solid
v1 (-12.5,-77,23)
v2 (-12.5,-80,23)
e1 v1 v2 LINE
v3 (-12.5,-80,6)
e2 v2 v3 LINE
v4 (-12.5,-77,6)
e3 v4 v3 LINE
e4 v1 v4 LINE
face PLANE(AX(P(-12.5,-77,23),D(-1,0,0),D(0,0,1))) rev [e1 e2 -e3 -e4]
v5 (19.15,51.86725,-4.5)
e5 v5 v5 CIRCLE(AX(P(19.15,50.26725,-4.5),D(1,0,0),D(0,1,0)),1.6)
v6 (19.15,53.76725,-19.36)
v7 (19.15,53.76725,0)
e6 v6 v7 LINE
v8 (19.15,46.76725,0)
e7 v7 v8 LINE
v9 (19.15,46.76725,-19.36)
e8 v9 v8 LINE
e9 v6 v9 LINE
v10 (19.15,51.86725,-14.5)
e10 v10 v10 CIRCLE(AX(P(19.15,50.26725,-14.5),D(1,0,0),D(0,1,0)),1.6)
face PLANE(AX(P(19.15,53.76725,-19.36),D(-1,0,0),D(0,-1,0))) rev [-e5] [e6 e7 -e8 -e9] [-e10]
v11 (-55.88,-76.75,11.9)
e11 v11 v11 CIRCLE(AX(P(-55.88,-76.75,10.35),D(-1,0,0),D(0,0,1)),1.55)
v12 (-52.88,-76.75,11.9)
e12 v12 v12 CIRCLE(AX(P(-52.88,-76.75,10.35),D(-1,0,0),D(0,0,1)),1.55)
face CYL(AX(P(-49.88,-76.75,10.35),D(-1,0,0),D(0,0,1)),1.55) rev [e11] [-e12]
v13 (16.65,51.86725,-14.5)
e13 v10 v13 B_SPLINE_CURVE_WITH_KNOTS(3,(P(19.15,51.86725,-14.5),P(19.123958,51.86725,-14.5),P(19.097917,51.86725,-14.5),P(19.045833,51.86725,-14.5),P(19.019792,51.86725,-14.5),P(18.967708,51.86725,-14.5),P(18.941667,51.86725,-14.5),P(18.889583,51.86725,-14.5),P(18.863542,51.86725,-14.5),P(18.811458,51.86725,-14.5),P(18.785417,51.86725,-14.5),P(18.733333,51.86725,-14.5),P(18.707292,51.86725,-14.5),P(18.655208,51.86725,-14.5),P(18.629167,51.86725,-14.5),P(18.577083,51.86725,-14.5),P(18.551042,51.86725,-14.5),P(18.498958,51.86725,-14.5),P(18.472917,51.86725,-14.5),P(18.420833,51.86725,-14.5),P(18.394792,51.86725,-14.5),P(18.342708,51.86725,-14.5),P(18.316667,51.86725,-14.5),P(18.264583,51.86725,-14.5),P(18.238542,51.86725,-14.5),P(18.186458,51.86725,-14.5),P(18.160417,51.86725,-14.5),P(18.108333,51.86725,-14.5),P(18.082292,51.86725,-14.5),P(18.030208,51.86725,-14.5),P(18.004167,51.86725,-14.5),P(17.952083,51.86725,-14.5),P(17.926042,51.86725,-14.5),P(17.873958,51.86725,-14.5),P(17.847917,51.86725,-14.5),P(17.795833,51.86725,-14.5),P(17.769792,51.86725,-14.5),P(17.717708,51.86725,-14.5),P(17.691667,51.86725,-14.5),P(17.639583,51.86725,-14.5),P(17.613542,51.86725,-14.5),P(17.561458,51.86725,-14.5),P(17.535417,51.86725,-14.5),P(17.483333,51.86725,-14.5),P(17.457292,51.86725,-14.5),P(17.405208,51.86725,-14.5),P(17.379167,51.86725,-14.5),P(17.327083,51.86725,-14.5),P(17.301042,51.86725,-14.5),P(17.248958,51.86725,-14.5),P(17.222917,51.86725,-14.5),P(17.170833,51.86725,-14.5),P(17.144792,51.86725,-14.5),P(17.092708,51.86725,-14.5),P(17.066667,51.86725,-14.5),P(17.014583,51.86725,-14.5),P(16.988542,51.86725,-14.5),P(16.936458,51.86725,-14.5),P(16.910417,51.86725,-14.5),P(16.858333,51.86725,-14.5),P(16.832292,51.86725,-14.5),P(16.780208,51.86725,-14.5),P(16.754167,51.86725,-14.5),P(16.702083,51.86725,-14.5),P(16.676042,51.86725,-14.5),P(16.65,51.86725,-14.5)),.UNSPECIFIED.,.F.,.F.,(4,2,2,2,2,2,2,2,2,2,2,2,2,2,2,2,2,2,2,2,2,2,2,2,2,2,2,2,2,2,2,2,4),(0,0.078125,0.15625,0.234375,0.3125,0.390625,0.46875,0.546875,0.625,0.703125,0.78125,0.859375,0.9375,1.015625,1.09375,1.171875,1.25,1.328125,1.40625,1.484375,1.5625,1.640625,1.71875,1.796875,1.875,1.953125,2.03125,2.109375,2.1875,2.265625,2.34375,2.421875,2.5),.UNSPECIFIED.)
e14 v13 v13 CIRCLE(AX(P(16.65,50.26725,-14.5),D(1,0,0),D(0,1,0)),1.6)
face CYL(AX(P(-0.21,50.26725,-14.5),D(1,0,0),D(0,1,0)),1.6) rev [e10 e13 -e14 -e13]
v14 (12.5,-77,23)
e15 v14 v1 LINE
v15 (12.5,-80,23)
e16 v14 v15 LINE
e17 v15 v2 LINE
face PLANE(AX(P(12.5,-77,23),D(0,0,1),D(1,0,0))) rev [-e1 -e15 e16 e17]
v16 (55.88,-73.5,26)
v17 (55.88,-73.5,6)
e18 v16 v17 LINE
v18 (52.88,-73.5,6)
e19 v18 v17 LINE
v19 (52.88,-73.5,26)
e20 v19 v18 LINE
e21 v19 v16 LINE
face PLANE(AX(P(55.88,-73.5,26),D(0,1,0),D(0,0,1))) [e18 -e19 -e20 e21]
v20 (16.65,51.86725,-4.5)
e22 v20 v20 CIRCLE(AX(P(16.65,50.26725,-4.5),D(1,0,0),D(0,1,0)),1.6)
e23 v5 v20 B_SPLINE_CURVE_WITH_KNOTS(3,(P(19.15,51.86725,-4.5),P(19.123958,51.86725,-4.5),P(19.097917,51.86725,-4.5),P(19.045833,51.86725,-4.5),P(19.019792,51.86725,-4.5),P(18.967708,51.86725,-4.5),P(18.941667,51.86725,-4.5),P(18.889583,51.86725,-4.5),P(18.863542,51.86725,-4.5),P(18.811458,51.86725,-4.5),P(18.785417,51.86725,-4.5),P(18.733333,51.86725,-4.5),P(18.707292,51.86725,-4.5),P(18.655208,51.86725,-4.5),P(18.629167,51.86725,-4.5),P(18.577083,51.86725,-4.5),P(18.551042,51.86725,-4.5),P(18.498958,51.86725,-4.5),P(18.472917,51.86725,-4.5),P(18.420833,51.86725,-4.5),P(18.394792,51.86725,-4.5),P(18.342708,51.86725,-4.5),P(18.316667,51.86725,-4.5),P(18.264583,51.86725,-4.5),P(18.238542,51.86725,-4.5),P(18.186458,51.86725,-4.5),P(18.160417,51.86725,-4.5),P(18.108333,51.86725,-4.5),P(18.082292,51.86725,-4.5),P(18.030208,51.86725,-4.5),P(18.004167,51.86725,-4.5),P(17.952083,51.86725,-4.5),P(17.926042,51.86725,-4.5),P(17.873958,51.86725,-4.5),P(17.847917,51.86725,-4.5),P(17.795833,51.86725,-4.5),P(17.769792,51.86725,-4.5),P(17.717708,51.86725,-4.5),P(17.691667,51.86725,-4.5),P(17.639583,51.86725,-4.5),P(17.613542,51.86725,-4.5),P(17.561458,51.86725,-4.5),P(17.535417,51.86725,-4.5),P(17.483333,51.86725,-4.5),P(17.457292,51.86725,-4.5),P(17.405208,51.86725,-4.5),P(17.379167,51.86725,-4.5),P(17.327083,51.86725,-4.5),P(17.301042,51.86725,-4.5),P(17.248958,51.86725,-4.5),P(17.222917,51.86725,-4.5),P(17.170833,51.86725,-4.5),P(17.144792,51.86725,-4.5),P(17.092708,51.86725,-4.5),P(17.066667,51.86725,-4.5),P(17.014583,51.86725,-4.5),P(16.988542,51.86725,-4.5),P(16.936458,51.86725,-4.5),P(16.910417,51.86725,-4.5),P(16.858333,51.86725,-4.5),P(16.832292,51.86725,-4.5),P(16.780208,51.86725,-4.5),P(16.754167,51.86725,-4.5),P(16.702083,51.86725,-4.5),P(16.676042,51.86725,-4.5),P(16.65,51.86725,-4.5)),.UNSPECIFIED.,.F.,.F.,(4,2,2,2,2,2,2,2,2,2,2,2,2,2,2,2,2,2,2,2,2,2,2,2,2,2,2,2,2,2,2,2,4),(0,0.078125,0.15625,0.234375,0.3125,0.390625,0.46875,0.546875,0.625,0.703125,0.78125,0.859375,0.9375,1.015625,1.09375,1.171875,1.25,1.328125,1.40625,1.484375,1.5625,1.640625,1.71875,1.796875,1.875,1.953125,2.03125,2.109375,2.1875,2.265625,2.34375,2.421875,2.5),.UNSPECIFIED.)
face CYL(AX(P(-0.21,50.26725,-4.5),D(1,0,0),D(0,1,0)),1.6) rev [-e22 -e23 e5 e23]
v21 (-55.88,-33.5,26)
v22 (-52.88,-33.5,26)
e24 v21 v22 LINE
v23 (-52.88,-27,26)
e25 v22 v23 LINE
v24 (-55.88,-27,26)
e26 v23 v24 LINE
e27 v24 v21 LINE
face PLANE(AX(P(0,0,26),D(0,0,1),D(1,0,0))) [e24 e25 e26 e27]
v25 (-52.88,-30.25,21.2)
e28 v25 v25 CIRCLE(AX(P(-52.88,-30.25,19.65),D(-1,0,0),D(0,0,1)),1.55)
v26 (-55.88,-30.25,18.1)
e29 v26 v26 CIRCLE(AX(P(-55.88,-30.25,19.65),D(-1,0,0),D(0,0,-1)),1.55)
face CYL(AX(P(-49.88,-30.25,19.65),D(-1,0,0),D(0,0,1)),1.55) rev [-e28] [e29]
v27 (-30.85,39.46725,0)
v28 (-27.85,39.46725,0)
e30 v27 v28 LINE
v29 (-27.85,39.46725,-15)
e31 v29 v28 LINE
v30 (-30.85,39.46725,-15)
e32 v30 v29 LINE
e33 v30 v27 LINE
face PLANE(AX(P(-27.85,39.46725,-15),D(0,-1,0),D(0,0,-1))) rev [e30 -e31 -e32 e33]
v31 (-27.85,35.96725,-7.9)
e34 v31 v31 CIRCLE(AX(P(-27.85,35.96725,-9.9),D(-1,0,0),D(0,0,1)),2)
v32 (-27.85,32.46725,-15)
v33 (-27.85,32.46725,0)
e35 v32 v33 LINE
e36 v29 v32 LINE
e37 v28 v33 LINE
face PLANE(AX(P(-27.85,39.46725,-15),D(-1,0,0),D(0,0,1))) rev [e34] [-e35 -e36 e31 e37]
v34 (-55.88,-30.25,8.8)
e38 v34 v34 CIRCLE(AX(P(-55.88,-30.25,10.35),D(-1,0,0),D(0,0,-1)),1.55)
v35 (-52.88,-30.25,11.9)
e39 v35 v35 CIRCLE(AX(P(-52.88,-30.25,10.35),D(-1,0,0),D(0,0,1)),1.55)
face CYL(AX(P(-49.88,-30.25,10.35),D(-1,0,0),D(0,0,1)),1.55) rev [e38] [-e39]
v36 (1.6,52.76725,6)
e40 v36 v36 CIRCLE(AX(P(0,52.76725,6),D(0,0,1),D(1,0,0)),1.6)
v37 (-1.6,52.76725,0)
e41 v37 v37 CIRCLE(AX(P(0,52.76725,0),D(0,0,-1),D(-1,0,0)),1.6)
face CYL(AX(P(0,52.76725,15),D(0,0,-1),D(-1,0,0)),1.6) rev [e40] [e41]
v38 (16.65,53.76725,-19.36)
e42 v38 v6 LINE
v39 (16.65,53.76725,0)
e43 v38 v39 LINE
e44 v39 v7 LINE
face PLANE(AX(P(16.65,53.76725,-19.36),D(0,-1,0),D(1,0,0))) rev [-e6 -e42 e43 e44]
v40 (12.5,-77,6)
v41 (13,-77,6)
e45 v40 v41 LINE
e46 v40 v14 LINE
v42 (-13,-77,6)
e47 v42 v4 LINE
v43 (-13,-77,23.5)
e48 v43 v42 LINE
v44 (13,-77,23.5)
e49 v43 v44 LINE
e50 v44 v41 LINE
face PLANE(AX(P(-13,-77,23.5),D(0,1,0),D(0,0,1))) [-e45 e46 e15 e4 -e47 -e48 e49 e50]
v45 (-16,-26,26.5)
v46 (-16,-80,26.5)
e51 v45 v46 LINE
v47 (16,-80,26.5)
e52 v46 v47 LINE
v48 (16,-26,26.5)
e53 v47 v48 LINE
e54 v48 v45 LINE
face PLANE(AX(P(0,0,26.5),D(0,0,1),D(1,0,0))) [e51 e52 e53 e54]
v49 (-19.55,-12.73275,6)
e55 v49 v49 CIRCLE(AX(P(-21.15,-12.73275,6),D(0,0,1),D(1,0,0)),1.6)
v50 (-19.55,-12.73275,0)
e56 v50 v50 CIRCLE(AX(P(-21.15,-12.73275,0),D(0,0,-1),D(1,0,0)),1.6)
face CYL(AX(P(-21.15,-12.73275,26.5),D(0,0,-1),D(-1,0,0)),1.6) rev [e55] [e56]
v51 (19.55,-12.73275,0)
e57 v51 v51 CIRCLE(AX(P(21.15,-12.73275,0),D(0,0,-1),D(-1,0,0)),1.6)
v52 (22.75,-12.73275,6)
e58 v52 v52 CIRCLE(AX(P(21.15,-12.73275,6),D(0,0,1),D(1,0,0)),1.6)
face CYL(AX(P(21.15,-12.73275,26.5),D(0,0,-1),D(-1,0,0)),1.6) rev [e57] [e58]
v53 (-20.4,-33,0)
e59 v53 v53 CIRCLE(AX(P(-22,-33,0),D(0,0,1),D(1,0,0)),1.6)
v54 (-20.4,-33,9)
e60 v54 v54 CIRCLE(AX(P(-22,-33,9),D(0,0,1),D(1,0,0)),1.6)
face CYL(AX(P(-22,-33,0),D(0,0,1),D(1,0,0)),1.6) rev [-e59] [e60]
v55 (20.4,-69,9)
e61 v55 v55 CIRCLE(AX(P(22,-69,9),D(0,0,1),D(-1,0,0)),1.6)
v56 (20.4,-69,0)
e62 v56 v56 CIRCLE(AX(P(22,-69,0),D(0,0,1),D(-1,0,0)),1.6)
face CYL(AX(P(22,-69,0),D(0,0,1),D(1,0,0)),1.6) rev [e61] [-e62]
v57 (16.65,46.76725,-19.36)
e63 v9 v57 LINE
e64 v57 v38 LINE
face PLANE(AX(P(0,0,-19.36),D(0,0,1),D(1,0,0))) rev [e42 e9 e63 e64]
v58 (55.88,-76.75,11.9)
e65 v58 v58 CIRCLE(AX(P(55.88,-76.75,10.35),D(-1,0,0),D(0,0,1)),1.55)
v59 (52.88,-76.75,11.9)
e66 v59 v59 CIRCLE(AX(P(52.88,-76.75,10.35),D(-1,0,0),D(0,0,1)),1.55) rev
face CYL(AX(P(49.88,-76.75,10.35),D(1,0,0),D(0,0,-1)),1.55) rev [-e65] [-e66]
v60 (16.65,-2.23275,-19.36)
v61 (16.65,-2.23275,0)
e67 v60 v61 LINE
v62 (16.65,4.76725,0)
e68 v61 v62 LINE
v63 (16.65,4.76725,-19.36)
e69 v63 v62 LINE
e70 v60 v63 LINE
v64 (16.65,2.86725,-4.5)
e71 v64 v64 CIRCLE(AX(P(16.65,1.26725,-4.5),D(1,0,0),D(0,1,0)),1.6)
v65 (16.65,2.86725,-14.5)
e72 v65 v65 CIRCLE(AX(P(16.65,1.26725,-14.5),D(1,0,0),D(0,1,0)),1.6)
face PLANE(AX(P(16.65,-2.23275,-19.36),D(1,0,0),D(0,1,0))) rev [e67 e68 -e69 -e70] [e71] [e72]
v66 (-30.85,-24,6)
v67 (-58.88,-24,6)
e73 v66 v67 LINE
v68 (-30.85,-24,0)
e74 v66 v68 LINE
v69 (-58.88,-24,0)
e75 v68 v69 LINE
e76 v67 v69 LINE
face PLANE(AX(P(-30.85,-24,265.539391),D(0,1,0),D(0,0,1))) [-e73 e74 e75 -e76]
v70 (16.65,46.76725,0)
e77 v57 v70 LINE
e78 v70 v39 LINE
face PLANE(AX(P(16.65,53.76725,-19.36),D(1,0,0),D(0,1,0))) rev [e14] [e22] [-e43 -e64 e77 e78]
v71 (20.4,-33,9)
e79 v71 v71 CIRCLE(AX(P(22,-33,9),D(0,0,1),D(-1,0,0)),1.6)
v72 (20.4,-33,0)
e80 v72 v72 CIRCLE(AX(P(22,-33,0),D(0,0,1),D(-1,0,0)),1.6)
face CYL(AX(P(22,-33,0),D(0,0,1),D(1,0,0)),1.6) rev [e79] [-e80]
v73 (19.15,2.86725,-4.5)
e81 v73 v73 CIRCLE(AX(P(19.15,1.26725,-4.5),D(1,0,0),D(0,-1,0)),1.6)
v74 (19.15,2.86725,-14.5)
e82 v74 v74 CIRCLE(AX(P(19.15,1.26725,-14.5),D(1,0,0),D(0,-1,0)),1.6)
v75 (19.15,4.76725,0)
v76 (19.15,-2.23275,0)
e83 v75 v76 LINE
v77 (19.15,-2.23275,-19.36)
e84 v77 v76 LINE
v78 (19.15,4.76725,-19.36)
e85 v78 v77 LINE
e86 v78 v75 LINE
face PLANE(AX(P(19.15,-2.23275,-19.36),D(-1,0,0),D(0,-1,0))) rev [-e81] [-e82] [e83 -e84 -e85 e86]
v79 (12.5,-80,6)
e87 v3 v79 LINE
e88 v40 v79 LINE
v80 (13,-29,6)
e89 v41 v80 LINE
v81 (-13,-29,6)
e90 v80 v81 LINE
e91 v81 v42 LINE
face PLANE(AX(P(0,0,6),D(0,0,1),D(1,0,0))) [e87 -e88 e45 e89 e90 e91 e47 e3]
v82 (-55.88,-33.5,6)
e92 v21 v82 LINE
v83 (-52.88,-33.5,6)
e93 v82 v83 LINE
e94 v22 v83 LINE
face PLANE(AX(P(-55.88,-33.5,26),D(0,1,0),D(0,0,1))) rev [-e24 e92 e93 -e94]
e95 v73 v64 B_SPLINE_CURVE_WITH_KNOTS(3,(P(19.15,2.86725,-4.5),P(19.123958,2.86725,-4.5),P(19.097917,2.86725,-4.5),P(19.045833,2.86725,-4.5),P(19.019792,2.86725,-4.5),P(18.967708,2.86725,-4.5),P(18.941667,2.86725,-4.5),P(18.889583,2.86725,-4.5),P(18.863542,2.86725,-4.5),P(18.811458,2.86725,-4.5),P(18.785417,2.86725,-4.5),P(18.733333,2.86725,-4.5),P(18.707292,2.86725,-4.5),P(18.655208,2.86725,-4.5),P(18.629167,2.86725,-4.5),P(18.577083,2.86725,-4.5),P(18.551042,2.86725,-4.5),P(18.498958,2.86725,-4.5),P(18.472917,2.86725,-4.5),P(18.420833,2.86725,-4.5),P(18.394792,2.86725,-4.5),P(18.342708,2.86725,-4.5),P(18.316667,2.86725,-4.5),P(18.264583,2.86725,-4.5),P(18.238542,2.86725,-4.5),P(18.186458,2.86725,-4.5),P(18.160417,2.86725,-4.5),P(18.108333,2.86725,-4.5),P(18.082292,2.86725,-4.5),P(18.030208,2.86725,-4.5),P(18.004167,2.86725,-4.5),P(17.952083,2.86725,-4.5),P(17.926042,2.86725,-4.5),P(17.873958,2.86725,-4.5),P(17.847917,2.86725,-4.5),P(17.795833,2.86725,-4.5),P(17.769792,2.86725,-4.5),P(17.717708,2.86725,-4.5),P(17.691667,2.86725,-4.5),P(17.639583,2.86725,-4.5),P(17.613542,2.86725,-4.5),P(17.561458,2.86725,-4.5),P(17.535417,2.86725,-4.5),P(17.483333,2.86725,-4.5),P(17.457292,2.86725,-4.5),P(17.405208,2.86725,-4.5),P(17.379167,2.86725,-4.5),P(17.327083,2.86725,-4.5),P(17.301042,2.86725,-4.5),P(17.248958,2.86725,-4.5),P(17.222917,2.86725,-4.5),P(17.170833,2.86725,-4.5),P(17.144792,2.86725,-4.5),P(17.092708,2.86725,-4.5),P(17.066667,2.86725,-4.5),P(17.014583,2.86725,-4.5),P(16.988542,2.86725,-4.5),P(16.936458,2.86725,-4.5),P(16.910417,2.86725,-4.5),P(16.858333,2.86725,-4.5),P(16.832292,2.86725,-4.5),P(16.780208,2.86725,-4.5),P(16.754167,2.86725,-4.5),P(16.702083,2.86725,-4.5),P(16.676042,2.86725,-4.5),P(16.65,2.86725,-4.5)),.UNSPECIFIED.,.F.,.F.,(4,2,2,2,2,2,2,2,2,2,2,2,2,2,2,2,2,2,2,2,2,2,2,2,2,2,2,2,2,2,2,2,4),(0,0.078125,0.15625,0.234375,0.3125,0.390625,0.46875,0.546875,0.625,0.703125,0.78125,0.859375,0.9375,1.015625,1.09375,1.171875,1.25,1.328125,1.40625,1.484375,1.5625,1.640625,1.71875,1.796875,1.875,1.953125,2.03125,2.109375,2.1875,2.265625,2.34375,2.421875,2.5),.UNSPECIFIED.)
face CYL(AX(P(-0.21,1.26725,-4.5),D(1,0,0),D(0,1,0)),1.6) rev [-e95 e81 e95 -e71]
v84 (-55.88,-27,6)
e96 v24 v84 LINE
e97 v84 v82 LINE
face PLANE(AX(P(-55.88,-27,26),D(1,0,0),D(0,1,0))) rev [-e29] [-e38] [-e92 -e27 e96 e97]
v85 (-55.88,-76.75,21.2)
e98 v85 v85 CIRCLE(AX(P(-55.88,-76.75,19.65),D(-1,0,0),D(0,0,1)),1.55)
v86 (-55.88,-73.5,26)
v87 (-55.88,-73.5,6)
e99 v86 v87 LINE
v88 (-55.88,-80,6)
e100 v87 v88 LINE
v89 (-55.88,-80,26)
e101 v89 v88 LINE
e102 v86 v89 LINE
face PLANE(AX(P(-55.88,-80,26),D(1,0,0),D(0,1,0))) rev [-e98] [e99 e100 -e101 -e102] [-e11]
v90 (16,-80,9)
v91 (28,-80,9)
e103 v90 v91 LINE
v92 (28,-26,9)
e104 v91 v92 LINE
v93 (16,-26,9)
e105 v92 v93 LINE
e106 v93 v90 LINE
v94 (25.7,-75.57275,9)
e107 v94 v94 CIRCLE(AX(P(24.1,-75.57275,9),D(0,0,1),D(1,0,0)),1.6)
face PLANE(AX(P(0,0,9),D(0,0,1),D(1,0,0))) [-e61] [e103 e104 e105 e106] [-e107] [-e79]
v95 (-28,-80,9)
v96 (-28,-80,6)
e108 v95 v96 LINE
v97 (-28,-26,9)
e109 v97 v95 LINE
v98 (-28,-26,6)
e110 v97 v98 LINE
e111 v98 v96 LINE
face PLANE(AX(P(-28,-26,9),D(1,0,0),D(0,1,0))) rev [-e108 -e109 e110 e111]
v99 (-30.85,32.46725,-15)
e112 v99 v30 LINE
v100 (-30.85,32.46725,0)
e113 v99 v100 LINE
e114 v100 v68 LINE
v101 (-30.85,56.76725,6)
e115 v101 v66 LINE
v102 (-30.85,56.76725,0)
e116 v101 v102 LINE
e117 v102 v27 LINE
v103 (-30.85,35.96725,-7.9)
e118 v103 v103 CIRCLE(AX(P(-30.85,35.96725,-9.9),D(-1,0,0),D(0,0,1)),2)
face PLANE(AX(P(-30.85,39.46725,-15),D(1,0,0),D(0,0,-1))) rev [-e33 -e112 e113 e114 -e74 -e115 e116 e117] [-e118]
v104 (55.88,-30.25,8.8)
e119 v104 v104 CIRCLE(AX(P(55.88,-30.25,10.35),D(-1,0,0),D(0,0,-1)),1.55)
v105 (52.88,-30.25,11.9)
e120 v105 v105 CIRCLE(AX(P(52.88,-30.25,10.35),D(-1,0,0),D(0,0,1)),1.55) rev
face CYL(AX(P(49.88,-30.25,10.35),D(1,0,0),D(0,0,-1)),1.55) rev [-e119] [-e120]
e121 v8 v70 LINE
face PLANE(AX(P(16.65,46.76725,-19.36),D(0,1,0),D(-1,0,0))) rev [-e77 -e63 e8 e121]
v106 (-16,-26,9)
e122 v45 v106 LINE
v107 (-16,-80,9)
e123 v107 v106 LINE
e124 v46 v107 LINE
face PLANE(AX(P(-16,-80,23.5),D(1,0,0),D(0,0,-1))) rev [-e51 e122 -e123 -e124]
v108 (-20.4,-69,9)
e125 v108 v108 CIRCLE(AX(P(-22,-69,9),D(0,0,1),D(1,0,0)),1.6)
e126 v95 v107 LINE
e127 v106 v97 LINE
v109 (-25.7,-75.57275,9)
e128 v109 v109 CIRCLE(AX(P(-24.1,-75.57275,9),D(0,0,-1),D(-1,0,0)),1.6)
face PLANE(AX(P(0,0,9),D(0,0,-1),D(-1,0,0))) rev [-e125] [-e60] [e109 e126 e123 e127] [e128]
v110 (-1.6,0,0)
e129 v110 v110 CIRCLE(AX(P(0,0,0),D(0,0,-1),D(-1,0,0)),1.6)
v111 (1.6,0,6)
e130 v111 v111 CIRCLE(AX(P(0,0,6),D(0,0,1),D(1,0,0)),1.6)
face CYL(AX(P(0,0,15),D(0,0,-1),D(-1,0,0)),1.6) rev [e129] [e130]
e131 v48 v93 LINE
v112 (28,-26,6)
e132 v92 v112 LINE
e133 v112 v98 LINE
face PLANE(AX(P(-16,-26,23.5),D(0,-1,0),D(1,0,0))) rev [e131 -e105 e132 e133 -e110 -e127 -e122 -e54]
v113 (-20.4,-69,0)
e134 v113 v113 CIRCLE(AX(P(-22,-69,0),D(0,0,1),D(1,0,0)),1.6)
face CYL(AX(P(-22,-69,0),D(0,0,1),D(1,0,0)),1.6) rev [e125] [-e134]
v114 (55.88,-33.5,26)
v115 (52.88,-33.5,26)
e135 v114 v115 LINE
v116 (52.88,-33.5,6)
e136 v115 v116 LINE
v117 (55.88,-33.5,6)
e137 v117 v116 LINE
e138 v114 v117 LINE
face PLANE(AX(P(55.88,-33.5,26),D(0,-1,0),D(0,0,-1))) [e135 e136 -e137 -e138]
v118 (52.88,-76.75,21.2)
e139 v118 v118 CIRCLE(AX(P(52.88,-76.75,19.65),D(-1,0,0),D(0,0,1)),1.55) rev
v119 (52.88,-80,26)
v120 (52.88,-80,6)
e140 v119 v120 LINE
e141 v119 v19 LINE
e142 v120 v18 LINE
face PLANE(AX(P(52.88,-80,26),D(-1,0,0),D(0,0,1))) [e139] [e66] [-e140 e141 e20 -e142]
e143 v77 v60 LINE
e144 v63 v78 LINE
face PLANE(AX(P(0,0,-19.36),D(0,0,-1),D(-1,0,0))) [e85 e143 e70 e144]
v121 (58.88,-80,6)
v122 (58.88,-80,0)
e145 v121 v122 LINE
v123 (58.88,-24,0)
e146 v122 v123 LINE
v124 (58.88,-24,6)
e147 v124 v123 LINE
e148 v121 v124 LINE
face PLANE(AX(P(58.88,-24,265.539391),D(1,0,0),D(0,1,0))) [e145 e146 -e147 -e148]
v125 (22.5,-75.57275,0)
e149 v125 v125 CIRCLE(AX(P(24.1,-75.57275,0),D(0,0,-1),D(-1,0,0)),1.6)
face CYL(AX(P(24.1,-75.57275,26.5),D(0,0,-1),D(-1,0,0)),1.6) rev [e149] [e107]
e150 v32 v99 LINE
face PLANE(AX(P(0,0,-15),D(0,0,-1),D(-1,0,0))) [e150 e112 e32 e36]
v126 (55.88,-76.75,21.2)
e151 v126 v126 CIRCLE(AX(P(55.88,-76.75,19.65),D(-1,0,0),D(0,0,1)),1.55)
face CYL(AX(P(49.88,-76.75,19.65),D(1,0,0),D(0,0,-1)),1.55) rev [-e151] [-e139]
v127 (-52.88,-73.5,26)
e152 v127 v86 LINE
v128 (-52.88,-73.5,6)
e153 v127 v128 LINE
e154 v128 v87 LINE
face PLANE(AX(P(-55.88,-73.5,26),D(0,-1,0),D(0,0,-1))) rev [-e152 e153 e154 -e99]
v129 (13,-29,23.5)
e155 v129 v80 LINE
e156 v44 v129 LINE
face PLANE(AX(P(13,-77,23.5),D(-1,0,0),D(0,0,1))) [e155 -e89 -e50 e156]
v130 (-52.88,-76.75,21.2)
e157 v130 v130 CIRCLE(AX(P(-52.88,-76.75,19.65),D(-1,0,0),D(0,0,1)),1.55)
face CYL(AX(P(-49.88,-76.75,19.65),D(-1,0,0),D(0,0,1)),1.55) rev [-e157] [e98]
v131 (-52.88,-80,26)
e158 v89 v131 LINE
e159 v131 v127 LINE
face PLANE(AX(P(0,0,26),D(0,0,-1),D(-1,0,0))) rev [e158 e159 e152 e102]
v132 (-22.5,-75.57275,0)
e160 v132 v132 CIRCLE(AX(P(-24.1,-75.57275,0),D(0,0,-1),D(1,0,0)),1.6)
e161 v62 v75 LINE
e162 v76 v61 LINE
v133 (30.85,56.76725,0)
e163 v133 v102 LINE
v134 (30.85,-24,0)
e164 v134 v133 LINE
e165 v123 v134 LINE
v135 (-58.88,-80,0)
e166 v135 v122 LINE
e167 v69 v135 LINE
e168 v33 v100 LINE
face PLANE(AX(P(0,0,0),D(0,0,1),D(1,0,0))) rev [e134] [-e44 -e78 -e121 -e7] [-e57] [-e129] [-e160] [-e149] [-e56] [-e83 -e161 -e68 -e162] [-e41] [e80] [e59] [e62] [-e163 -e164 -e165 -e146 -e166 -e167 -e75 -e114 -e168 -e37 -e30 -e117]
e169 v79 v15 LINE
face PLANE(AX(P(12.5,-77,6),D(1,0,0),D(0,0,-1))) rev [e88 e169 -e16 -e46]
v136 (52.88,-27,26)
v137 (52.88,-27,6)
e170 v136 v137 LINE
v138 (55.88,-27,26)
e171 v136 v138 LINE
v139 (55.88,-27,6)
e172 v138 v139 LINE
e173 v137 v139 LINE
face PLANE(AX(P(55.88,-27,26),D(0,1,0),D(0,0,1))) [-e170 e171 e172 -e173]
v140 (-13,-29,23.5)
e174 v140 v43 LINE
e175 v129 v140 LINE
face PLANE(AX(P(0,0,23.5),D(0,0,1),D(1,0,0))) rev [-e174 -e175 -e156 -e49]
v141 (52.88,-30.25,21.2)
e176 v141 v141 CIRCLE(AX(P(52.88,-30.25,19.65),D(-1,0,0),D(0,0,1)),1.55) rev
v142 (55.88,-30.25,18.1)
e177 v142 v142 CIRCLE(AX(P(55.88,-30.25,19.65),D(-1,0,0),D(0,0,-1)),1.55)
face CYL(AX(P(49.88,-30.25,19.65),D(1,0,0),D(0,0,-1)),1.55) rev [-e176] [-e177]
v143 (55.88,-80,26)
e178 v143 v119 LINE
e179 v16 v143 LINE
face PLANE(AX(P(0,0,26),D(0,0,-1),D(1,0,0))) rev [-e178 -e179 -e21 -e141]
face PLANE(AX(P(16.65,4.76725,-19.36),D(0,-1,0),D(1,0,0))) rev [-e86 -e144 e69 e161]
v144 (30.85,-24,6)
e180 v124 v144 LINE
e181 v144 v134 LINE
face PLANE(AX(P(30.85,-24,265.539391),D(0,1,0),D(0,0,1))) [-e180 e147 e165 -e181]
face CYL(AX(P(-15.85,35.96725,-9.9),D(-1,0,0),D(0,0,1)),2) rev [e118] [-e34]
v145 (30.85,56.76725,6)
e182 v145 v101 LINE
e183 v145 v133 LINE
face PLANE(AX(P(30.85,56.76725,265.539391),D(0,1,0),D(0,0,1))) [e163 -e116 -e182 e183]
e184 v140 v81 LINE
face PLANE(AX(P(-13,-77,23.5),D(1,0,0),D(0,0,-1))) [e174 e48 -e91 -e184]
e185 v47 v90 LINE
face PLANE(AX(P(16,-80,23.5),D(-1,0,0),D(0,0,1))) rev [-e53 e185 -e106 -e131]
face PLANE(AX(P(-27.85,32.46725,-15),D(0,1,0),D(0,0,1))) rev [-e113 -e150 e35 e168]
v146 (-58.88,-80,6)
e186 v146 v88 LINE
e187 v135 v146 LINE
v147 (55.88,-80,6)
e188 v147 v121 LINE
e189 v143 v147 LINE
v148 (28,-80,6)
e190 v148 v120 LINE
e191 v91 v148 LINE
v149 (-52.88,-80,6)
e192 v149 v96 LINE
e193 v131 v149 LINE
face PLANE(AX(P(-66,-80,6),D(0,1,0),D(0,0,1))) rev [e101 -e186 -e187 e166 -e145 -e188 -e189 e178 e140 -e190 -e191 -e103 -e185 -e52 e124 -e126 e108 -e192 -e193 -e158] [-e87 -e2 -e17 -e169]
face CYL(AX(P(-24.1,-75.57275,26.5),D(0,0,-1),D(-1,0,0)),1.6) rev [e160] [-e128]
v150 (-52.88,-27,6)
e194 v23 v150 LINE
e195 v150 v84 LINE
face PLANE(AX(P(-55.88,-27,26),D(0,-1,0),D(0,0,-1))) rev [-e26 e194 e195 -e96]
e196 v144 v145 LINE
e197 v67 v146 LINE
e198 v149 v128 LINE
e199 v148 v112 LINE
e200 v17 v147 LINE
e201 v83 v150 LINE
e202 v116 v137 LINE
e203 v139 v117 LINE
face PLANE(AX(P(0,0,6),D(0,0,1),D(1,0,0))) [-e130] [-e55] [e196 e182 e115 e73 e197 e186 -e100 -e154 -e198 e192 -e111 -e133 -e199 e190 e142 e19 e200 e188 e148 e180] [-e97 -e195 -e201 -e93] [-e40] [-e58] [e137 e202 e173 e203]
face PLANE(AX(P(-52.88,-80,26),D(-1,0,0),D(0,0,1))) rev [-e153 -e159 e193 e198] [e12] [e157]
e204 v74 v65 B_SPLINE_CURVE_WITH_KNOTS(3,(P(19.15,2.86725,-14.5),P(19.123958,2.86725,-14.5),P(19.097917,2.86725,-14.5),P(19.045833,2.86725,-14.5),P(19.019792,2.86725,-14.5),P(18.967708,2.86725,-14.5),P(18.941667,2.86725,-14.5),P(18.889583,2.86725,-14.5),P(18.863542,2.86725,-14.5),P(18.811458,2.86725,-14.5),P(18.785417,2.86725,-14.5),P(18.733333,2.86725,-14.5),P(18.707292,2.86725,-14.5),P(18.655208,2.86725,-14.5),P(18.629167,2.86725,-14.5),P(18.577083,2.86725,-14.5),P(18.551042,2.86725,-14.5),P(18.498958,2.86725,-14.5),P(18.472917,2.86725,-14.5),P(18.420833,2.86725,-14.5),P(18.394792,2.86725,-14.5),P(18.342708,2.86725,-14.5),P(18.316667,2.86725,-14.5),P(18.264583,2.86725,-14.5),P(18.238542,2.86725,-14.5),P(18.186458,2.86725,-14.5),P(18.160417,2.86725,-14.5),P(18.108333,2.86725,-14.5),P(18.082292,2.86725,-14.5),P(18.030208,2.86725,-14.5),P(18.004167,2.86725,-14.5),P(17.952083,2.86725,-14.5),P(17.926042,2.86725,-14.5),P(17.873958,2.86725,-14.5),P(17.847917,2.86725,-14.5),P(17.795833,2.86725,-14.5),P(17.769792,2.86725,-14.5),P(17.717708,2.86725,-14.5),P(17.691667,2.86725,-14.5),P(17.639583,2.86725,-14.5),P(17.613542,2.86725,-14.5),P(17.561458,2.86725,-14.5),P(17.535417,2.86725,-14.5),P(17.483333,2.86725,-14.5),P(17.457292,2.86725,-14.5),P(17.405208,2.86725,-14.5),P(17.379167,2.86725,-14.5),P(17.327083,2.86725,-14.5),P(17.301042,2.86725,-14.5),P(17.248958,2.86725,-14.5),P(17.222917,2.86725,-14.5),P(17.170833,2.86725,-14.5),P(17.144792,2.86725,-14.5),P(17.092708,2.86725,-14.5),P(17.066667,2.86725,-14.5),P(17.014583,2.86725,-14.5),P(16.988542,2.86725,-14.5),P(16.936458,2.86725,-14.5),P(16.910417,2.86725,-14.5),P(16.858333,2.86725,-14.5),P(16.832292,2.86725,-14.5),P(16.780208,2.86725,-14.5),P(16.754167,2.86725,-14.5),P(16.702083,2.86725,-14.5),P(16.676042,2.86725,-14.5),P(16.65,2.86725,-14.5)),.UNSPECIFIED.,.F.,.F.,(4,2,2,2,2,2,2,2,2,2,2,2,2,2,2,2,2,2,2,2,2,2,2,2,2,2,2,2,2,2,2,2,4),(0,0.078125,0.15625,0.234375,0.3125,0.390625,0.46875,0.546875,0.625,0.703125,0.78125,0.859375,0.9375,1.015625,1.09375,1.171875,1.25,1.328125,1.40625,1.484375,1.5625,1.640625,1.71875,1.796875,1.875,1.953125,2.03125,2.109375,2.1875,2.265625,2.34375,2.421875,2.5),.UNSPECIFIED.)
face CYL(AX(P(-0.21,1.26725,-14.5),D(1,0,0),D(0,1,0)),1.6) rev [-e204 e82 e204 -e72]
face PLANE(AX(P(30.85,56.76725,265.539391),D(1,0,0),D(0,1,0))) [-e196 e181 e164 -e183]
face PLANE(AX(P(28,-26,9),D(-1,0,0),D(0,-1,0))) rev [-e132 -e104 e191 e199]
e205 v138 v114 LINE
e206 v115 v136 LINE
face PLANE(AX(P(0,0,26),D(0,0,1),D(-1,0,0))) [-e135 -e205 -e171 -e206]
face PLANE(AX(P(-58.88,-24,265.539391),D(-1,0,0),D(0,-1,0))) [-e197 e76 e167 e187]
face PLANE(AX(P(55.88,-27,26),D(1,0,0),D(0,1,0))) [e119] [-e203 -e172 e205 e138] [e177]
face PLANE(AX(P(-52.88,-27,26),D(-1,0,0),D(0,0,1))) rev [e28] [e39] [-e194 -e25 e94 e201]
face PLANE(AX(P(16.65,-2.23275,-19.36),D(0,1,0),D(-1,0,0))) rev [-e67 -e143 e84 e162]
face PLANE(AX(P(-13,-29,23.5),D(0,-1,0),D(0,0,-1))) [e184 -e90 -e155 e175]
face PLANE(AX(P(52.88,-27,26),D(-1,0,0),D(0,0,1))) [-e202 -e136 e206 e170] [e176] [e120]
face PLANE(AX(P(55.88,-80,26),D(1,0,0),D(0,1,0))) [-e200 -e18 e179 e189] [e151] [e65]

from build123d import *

# Parameters (mm, degrees)
SKETCH1_W           = 132
SKETCH1_H           = 160
BOSS_EXTRUDE1_DEPTH = 6
SKETCH3_W           = 32
SKETCH3_H           = 54
SKETCH3_W_2         = 26
SKETCH3_H_2         = 48
BOSS_EXTRUDE2_DEPTH = 17.5
SKETCH4_W           = 32
SKETCH4_H           = 54
BOSS_EXTRUDE3_DEPTH = 3
SKETCH5_W           = 25
SKETCH5_H           = 17
CUT_EXTRUDE1_DEPTH  = 3
SKETCH6_W           = 12
SKETCH6_H           = 54
BOSS_EXTRUDE4_DEPTH = 3
SKETCH7_R           = 1.6
CUT_EXTRUDE2_DEPTH  = 106.177231376
SKETCH8_W           = 3
SKETCH8_H           = 6.5
BOSS_EXTRUDE5_DEPTH = 20
SKETCH9_R           = 1.55
CUT_EXTRUDE3_DEPTH  = 6
SKETCH10_R          = 1.6
CUT_EXTRUDE4_DEPTH  = 108.043215572
SKETCH11_W          = 2.5
SKETCH11_H          = 7
BOSS_EXTRUDE6_DEPTH = 19.36
SKETCH12_R          = 1.6
CUT_EXTRUDE5_DEPTH  = 19.36
SKETCH13_W          = 3
SKETCH13_H          = 7
BOSS_EXTRUDE7_DEPTH = 15
SKETCH14_R          = 2
CUT_EXTRUDE6_DEPTH  = 15
CUT_EXTRUDE7_START  = -6
CUT_EXTRUDE7_DEPTH  = 6
SKETCH16_R          = 1.6
CUT_EXTRUDE8_DEPTH  = 15


# Read off the part's stored shape, not the designer's step: Cut-Extrude7
with BuildPart() as part:
    # Sketch1 → Boss-Extrude1 (new body)
    with BuildSketch(Plane.XY):
        Rectangle(SKETCH1_W, SKETCH1_H)
    extrude(amount=BOSS_EXTRUDE1_DEPTH)

    # Sketch3 → Boss-Extrude2 (add)
    with BuildSketch(Plane.XY.offset(6)):
        with Locations((0, -53)):
            Rectangle(SKETCH3_W, SKETCH3_H)
        with Locations((0, -53)):
            Rectangle(SKETCH3_W_2, SKETCH3_H_2, mode=Mode.SUBTRACT)
    extrude(amount=BOSS_EXTRUDE2_DEPTH)

    # Sketch4 → Boss-Extrude3 (add)
    with BuildSketch(Plane.XY.offset(23.5)):
        with Locations((0, -53)):
            Rectangle(SKETCH4_W, SKETCH4_H)
    extrude(amount=BOSS_EXTRUDE3_DEPTH)

    # Sketch5 → Cut-Extrude1 (cut)
    with BuildSketch(Plane.XZ.offset(80)):
        with Locations((0, 14.5)):
            Rectangle(SKETCH5_W, SKETCH5_H)
    extrude(amount=-CUT_EXTRUDE1_DEPTH, mode=Mode.SUBTRACT)

    # Sketch6 → Boss-Extrude4 (add)
    with BuildSketch(Plane.XY.offset(6)):
        with Locations((-22, -53)):
            Rectangle(SKETCH6_W, SKETCH6_H)
        with Locations((22, -53)):
            Rectangle(SKETCH6_W, SKETCH6_H)
    extrude(amount=BOSS_EXTRUDE4_DEPTH)

    # Sketch7 → Cut-Extrude2 (cut, through all)
    with BuildSketch(Plane.XY.offset(9)):
        with Locations((-22, -69)):
            Circle(SKETCH7_R)
        with Locations((-22, -33)):
            Circle(SKETCH7_R)
        with Locations(Location((22, -69, 0), (0, 0, 180))):
            Circle(SKETCH7_R)
        with Locations(Location((22, -33, 0), (0, 0, 180))):
            Circle(SKETCH7_R)
    extrude(amount=-CUT_EXTRUDE2_DEPTH, mode=Mode.SUBTRACT)

    # Sketch8 → Boss-Extrude5 (add)
    with BuildSketch(Plane.XY.offset(6)):
        with Locations((-54.38, -76.75)):
            Rectangle(SKETCH8_W, SKETCH8_H)
        with Locations((-54.38, -30.25)):
            Rectangle(SKETCH8_W, SKETCH8_H)
    boss_extrude5 = extrude(amount=BOSS_EXTRUDE5_DEPTH)

    # Sketch9 → Cut-Extrude3 (cut)
    with BuildSketch(Plane.ZY.offset(55.88)):
        with Locations((10.35, -76.75)):
            Circle(SKETCH9_R)
        with Locations((19.65, -76.75)):
            Circle(SKETCH9_R)
        with Locations((10.35, -30.25)):
            Circle(SKETCH9_R)
        with Locations((19.65, -30.25)):
            Circle(SKETCH9_R)
    cut_extrude3 = extrude(amount=-CUT_EXTRUDE3_DEPTH, mode=Mode.SUBTRACT)

    # Mirror1: Boss-Extrude5, Cut-Extrude3 across plane
    add(boss_extrude5.mirror(Plane(origin=(0, 0, 0), x_dir=(0, 0, 1), z_dir=(1, 0, 0))))
    add(cut_extrude3.mirror(Plane(origin=(0, 0, 0), x_dir=(0, 0, 1), z_dir=(1, 0, 0))), mode=Mode.SUBTRACT)

    # Sketch10 → Cut-Extrude4 (cut, through all)
    with BuildSketch(Plane(origin=(0, 0, 0), x_dir=(-1, 0, 0), z_dir=(0, 0, -1))):
        with Locations((-24.1, -75.572749788)):
            Circle(SKETCH10_R)
        with Locations((-21.15, -12.732749788)):
            Circle(SKETCH10_R)
        with Locations(Location((21.15, -12.732749788, 0), (0, 0, 180))):
            Circle(SKETCH10_R)
        with Locations((24.1, -75.572749788)):
            Circle(SKETCH10_R)
    extrude(amount=-CUT_EXTRUDE4_DEPTH, mode=Mode.SUBTRACT)

    # Sketch11 → Boss-Extrude6 (add)
    with BuildSketch(Plane(origin=(0, 0, 0), x_dir=(-1, 0, 0), z_dir=(0, 0, -1))):
        with Locations((-17.9, 1.267250212)):
            Rectangle(SKETCH11_W, SKETCH11_H)
        with Locations((-17.9, 50.267250212)):
            Rectangle(SKETCH11_W, SKETCH11_H)
    extrude(amount=BOSS_EXTRUDE6_DEPTH)

    # Sketch12 → Cut-Extrude5 (cut)
    with BuildSketch(Plane(origin=(19.15, 0, 0), x_dir=(0, 0, -1), z_dir=(1, 0, 0))):
        with Locations(Location((4.5, 50.267250212, 0), (0, 0, 90))):
            Circle(SKETCH12_R)
        with Locations(Location((14.5, 50.267250212, 0), (0, 0, 90))):
            Circle(SKETCH12_R)
        with Locations(Location((4.5, 1.267250212, 0), (0, 0, 90))):
            Circle(SKETCH12_R)
        with Locations(Location((14.5, 1.267250212, 0), (0, 0, 90))):
            Circle(SKETCH12_R)
    extrude(amount=-CUT_EXTRUDE5_DEPTH, mode=Mode.SUBTRACT)

    # Sketch13 → Boss-Extrude7 (add)
    with BuildSketch(Plane(origin=(0, 0, 0), x_dir=(-1, 0, 0), z_dir=(0, 0, -1))):
        with Locations((29.35, 35.967250212)):
            Rectangle(SKETCH13_W, SKETCH13_H)
    extrude(amount=BOSS_EXTRUDE7_DEPTH)

    # Sketch14 → Cut-Extrude6 (cut)
    with BuildSketch(Plane.ZY.offset(30.85)):
        with Locations((-9.9, 35.967250212)):
            Circle(SKETCH14_R)
    extrude(amount=-CUT_EXTRUDE6_DEPTH, mode=Mode.SUBTRACT)

    # Cut-Extrude7 outline → Cut-Extrude7 (cut)
    with BuildSketch(Plane(origin=(0, 0, 0), x_dir=(-1, 0, 0), z_dir=(0, 0, -1)).offset(CUT_EXTRUDE7_START)):
        Polygon((-30.85, 56.767250212), (30.85, 56.767250212), (30.85, -24), (58.88, -24), (58.88, -80), (66, -80), (66, 80), (-66, 80), (-66, -80), (-58.88, -80), (-58.88, -24), (-30.85, -24), align=None)
    extrude(amount=CUT_EXTRUDE7_DEPTH, mode=Mode.SUBTRACT)

    # Sketch16 → Cut-Extrude8 (cut)
    with BuildSketch(Plane(origin=(0, 0, 0), x_dir=(-1, 0, 0), z_dir=(0, 0, -1))):
        Circle(SKETCH16_R)
        with Locations((0, 52.767250212)):
            Circle(SKETCH16_R)
    extrude(amount=-CUT_EXTRUDE8_DEPTH, mode=Mode.SUBTRACT)


solid = part.part
